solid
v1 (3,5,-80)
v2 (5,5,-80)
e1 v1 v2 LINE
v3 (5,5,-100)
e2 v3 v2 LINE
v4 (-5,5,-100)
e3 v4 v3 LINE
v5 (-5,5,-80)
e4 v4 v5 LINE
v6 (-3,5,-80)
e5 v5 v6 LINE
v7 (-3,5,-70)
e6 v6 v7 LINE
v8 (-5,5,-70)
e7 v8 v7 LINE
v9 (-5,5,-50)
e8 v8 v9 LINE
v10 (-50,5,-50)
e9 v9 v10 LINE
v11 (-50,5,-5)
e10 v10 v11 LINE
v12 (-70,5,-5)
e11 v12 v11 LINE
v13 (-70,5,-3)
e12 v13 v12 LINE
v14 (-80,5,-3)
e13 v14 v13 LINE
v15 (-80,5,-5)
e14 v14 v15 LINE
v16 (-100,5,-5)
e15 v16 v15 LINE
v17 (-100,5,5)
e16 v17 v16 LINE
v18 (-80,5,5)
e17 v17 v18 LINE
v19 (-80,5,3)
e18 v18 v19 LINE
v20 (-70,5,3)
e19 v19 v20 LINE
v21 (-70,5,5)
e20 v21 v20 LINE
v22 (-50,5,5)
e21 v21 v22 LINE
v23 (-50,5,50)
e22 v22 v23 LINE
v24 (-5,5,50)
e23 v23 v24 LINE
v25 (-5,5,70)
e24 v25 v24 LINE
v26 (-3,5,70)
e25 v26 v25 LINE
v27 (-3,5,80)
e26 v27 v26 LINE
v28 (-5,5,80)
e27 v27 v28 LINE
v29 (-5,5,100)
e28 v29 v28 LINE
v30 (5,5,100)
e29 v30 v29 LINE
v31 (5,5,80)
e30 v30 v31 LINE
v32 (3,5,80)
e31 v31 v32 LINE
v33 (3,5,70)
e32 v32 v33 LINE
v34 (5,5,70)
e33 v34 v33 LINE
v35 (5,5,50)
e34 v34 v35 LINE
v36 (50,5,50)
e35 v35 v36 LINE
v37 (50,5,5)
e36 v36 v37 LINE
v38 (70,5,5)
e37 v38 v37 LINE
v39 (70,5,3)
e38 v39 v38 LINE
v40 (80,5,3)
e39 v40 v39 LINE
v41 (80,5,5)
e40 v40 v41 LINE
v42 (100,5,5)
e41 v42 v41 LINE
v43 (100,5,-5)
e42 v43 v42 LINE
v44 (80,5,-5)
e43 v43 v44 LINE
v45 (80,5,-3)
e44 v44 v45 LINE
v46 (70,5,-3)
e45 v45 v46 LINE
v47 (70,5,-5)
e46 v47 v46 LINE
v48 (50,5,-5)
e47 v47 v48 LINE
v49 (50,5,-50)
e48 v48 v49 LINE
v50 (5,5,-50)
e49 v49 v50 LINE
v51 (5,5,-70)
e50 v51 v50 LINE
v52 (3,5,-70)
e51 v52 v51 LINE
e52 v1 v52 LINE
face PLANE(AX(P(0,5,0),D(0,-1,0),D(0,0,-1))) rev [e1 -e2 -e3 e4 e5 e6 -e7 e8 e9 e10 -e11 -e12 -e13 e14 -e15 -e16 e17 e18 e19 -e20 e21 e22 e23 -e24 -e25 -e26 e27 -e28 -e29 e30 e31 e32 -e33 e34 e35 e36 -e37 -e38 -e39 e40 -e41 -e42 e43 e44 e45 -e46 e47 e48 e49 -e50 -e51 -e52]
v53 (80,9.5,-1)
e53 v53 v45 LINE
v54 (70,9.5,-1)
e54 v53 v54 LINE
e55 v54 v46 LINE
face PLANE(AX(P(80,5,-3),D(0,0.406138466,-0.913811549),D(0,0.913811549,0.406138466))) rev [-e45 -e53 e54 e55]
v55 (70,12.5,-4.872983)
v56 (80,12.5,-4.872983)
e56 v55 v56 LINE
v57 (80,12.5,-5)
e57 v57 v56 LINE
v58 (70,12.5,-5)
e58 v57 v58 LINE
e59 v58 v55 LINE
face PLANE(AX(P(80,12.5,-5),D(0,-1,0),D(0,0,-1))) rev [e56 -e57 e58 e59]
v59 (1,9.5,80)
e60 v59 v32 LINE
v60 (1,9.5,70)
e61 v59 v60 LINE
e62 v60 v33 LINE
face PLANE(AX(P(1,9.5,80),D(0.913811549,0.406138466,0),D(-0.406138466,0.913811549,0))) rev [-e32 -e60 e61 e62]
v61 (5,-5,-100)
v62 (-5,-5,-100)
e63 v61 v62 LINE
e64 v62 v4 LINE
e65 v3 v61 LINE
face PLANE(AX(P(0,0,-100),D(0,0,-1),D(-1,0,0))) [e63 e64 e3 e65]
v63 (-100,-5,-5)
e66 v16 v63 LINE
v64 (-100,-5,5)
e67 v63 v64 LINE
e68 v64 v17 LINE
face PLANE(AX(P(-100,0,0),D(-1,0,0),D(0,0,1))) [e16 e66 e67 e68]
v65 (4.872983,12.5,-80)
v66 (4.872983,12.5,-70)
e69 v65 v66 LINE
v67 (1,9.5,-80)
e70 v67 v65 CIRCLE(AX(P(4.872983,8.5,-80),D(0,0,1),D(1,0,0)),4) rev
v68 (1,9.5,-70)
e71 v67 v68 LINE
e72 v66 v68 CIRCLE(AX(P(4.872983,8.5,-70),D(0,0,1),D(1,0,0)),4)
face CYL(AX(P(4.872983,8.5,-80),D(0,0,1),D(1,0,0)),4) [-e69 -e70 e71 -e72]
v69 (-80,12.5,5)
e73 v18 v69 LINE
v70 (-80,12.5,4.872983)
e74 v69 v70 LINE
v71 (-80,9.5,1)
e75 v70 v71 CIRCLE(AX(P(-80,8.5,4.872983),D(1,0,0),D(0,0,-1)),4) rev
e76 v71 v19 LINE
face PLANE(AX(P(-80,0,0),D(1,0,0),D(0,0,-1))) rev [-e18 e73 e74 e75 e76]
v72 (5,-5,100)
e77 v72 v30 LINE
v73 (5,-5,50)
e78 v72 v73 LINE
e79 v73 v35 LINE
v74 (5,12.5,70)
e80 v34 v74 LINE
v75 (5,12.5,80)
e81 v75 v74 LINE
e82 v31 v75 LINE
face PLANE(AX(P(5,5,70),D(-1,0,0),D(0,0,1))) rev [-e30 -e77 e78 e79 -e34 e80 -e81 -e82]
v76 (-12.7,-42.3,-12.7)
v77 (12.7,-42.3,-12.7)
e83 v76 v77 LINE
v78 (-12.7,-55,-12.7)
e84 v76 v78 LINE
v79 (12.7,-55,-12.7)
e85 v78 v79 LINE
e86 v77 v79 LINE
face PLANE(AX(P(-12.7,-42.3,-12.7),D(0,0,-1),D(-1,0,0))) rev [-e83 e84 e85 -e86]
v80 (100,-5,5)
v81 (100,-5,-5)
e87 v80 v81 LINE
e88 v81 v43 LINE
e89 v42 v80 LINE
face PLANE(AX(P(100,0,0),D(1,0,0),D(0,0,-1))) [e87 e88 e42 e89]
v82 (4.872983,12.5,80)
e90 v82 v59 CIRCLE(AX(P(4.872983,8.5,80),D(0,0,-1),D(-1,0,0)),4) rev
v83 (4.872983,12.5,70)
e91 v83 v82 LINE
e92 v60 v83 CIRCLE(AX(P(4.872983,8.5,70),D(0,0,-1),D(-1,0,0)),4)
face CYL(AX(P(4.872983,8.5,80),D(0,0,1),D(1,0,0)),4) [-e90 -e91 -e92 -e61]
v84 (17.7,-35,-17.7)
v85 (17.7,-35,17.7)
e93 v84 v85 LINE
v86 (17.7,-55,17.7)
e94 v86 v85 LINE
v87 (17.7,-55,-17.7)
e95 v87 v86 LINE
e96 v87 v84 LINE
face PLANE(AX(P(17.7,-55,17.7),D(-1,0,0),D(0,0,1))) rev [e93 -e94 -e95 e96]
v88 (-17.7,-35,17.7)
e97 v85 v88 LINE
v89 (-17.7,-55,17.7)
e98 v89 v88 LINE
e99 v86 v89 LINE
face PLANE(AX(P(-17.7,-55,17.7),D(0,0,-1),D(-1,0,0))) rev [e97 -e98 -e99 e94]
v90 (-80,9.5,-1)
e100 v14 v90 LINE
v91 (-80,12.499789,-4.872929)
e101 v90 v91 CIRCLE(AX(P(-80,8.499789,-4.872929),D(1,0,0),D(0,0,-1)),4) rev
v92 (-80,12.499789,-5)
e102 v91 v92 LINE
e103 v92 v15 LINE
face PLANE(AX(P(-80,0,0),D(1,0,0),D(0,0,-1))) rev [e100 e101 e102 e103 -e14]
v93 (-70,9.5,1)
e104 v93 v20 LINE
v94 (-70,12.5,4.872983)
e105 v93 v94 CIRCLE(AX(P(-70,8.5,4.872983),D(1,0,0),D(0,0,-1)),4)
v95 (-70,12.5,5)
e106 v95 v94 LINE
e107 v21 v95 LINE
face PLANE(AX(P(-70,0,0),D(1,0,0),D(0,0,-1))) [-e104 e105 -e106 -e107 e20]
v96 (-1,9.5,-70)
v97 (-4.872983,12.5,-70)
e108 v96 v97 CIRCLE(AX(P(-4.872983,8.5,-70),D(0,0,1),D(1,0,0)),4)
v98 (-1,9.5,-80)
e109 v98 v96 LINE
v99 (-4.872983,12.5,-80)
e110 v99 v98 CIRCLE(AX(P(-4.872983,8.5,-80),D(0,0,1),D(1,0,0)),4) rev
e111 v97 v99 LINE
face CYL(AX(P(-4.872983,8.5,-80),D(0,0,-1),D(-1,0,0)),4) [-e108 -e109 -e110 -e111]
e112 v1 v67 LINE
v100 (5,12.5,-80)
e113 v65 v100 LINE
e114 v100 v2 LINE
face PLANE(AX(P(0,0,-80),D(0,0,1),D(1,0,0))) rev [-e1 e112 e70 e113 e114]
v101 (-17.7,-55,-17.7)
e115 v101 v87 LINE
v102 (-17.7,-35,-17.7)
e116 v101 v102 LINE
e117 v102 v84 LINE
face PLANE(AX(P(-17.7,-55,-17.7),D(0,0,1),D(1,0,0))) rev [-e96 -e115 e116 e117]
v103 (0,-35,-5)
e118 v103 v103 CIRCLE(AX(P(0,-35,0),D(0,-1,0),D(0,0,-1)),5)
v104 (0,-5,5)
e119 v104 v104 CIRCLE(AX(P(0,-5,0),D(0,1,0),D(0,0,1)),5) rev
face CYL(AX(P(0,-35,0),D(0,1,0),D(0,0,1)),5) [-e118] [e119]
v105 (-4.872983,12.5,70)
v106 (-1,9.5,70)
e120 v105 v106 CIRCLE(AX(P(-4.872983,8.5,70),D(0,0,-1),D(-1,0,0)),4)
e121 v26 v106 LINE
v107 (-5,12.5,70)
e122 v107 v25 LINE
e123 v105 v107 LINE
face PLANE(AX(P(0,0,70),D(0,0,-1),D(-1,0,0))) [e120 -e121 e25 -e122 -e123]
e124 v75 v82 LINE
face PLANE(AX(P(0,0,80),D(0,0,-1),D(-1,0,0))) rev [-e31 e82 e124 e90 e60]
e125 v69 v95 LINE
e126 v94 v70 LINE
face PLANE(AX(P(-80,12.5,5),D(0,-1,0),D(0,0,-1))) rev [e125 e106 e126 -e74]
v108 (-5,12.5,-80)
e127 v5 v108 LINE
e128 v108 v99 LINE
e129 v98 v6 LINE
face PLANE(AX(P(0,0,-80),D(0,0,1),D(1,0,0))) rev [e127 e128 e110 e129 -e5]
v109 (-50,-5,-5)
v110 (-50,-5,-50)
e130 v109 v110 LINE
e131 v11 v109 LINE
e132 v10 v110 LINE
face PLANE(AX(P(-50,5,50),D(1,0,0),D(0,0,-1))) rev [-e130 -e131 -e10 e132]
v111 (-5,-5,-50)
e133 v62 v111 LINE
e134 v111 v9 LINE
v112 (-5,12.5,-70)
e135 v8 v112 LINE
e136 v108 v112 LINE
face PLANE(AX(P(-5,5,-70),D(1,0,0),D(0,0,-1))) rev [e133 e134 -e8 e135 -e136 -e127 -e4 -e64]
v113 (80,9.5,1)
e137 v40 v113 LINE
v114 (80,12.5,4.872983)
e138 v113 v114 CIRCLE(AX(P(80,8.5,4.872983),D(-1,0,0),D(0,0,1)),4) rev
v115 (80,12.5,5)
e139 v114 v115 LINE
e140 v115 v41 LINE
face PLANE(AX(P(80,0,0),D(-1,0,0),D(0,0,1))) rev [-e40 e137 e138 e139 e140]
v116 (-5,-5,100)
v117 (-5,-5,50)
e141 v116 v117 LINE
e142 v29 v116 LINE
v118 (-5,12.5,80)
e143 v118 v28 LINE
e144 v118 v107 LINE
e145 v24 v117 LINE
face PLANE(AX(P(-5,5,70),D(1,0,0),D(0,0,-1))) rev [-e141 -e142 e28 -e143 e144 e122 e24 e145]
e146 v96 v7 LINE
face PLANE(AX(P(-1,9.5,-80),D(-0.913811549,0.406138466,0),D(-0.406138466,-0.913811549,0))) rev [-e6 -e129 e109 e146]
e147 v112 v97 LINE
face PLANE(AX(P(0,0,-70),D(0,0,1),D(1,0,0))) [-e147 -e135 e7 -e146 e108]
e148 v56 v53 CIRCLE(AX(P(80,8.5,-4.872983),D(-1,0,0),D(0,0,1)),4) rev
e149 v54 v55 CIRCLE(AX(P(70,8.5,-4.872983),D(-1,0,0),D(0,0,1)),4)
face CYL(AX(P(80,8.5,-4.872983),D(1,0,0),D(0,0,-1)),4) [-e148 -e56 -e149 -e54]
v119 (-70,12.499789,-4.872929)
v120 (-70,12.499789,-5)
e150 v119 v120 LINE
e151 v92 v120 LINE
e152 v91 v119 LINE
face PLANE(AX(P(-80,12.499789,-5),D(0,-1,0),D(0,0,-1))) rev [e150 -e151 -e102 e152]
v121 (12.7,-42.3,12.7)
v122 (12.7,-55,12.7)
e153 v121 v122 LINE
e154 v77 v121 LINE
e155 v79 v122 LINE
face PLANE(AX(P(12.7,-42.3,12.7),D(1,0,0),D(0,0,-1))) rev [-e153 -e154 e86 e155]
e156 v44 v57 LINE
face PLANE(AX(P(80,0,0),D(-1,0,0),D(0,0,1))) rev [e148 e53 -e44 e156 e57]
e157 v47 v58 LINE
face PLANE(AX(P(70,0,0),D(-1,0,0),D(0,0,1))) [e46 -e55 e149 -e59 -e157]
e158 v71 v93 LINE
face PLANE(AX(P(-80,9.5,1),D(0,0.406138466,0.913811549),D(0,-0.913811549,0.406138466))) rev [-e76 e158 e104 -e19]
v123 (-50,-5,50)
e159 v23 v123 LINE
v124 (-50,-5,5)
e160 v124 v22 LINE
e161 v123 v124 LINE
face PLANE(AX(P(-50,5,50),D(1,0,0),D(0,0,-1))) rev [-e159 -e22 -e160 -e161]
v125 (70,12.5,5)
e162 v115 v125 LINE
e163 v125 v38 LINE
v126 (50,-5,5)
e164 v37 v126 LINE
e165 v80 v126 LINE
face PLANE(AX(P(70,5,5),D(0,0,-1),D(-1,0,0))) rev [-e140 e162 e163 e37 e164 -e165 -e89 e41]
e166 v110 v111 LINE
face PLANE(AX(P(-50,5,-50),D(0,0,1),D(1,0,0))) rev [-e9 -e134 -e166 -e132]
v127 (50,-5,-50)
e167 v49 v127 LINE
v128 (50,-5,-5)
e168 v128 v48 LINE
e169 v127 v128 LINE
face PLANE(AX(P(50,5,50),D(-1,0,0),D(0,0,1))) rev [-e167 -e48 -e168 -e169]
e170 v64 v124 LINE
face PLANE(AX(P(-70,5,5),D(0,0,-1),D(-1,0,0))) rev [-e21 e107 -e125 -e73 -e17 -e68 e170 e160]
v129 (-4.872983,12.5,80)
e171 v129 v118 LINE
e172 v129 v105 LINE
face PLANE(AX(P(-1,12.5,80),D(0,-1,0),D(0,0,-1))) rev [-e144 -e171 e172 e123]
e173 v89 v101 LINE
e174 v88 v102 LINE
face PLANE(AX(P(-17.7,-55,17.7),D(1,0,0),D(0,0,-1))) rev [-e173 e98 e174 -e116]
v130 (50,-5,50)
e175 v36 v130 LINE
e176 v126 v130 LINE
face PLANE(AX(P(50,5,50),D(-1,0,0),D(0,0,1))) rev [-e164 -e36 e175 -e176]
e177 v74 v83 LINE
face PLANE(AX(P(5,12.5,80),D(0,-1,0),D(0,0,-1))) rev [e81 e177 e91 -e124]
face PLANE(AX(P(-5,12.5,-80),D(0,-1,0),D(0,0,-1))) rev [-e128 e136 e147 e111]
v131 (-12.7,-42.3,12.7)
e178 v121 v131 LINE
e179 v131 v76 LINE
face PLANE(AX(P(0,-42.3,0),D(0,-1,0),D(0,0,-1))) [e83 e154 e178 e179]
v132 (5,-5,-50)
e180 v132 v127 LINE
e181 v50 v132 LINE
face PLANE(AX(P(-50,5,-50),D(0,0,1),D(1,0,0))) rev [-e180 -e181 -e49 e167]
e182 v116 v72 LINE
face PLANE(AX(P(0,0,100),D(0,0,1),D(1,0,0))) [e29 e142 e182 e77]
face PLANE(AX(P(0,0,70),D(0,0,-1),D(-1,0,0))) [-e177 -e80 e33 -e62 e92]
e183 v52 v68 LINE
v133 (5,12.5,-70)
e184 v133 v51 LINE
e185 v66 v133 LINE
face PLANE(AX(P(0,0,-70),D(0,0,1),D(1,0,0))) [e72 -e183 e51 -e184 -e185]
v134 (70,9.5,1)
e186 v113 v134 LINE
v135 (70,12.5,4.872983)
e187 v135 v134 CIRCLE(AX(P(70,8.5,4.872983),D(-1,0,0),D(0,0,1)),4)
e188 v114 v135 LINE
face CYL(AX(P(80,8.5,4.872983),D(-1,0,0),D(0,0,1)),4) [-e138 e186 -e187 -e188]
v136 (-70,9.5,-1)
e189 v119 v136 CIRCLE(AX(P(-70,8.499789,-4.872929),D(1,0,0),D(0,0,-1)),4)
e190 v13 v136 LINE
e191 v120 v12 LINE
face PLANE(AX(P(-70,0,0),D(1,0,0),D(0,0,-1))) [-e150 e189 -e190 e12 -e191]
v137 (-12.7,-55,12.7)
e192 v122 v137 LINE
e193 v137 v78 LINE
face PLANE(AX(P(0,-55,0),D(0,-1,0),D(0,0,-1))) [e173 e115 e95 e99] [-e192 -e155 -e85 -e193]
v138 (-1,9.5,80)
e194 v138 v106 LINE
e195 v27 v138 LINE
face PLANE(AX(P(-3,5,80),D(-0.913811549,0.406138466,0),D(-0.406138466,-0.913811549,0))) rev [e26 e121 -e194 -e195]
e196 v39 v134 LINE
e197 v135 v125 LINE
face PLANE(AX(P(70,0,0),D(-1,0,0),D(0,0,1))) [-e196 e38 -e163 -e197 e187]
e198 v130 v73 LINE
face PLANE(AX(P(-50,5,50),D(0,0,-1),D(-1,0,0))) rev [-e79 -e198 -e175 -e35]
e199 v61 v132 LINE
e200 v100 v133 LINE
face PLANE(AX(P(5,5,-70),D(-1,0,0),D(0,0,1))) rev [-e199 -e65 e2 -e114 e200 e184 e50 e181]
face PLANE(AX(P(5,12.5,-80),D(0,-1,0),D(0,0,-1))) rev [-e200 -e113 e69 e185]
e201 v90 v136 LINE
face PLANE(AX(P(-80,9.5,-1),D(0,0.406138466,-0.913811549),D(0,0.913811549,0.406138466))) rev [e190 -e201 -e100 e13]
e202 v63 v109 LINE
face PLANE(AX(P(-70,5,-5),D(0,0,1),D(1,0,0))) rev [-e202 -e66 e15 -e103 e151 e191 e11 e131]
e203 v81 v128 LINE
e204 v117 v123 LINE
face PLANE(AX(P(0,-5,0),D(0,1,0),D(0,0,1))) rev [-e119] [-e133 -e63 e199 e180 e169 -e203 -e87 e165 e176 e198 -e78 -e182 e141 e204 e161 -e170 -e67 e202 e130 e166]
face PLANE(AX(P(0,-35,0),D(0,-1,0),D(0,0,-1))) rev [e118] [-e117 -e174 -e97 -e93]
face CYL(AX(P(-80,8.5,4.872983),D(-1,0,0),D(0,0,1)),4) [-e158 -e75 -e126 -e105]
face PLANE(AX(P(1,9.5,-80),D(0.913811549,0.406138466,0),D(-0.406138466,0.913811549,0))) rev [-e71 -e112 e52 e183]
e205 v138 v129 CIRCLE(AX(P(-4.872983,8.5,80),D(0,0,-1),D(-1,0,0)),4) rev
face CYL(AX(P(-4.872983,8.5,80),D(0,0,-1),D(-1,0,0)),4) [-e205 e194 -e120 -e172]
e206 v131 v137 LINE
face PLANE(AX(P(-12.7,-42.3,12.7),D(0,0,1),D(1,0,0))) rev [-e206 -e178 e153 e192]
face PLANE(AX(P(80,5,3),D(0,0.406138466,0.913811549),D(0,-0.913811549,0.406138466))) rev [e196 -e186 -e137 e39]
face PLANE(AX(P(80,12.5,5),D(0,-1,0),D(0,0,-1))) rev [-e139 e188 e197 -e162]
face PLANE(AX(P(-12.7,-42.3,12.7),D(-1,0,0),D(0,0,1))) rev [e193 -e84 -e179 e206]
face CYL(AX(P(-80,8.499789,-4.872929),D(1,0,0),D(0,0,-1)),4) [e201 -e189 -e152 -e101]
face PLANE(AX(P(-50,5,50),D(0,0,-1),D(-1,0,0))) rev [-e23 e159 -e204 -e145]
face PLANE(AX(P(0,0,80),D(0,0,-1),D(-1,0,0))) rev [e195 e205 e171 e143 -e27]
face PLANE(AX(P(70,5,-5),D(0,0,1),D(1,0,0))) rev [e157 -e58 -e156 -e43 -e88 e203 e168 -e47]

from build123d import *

# Parameters (mm, degrees)
SKETCH2_W            = 100
SKETCH2_H            = 100
BOSS_EXTRUDE1_DEPTH  = 5
SKETCH3_W            = 100
SKETCH3_H            = 100
BOSS_EXTRUDE2_DEPTH  = 5
SKETCH8_R            = 5
BOSS_EXTRUDE7_DEPTH  = 30
SKETCH9_W            = 35.4
SKETCH9_H            = 35.4
BOSS_EXTRUDE8_DEPTH  = 20
SKETCH10_W           = 25.4
SKETCH10_H           = 25.4
CUT_EXTRUDE1_DEPTH   = 12.7
SKETCH11_W           = 10
SKETCH11_H           = 10
BOSS_EXTRUDE9_DEPTH  = 20
BOSS_EXTRUDE13_DEPTH = 10
FILLET3_R            = 4
FILLET5_R            = 4
SKETCH16_W           = 10
SKETCH16_H           = 10
BOSS_EXTRUDE14_DEPTH = 20
SKETCH13_W           = 10
SKETCH13_H           = 10
BOSS_EXTRUDE11_DEPTH = 20
BOSS_EXTRUDE17_DEPTH = 10
FILLET9_R            = 4
FILLET10_R           = 4
SKETCH21_W           = 10
SKETCH21_H           = 10
BOSS_EXTRUDE18_DEPTH = 20
SKETCH14_W           = 10
SKETCH14_H           = 10
BOSS_EXTRUDE12_DEPTH = 20
BOSS_EXTRUDE15_DEPTH = 10
FILLET7_R            = 4
SKETCH18_W           = 10
SKETCH18_H           = 10
BOSS_EXTRUDE16_DEPTH = 20
FILLET8_R            = 4
SKETCH12_W           = 10
SKETCH12_H           = 10
BOSS_EXTRUDE10_DEPTH = 20
BOSS_EXTRUDE19_DEPTH = 10
FILLET11_R           = 4
FILLET12_R           = 4
SKETCH23_W           = 10
SKETCH23_H           = 10
BOSS_EXTRUDE20_DEPTH = 20


with BuildPart() as part:
    # Sketch2 → Boss-Extrude1 (new body)
    with BuildSketch(Plane(origin=(0, 0, 0), x_dir=(1, 0, 0), z_dir=(0, 1, 0))):
        Rectangle(SKETCH2_W, SKETCH2_H)
    extrude(amount=BOSS_EXTRUDE1_DEPTH)

    # Sketch3 → Boss-Extrude2 (add)
    with BuildSketch(Plane.XZ):
        Rectangle(SKETCH3_W, SKETCH3_H)
    extrude(amount=BOSS_EXTRUDE2_DEPTH)

    # Sketch8 → Boss-Extrude7 (add)
    with BuildSketch(Plane.XZ.offset(5)):
        with Locations(Location((0, 0, 0), (0, 0, 90))):
            Circle(SKETCH8_R)
    extrude(amount=BOSS_EXTRUDE7_DEPTH)

    # Sketch9 → Boss-Extrude8 (add)
    with BuildSketch(Plane.XZ.offset(35)):
        Rectangle(SKETCH9_W, SKETCH9_H)
    extrude(amount=BOSS_EXTRUDE8_DEPTH)

    # Sketch10 → Cut-Extrude1 (cut)
    with BuildSketch(Plane.XZ.offset(55)):
        Rectangle(SKETCH10_W, SKETCH10_H)
    extrude(amount=-CUT_EXTRUDE1_DEPTH, mode=Mode.SUBTRACT)

    # Sketch11 → Boss-Extrude9 (add)
    with BuildSketch(Plane(origin=(50, 0, 0), x_dir=(0, 0, -1), z_dir=(1, 0, 0))):
        Rectangle(SKETCH11_W, SKETCH11_H)
    extrude(amount=BOSS_EXTRUDE9_DEPTH)

    # Sketch15 → Boss-Extrude13 (add)
    with BuildSketch(Plane(origin=(70, 0, 0), x_dir=(0, 0, -1), z_dir=(1, 0, 0))):
        Polygon((-5, -5), (5, -5), (5, 12.5), (1, 12.5), (1, 9.5), (3, 5), (-3, 5), (-1, 9.5), (-1, 12.5), (-5, 12.5), align=None)
    extrude(amount=BOSS_EXTRUDE13_DEPTH)

    # Fillet3
    # the kernel refuses this fillet: 4 mm, written as the material it takes off along each edge
    with BuildSketch(Plane(origin=(60.317541634, 12.5, 1), x_dir=(0, -1, 0), z_dir=(1, 0, 0))) as fillet3_piece_1:
        with BuildLine():
            CenterArc((4, -3.872983346), FILLET3_R, 104.477512186, 75.522487814)
            Line((0, -3.872983346), (-0.08, -3.872983346))
            Line((-0.08, -3.872983346), (-0.08, 0))
            Line((-0.08, 0), (0, 0.08))
            ThreePointArc((0, 0.08), (1.5, 0.08), (2.98, 0.077459667))
            Line((2.98, 0.077459667), (3, 0))
        make_face()
    extrude(amount=29.364916731, mode=Mode.SUBTRACT)

    # Fillet5
    # the kernel refuses this fillet: 4 mm, written as the material it takes off along each edge
    with BuildSketch(Plane(origin=(60.317541634, 12.5, -1), x_dir=(0, 0, -1), z_dir=(1, 0, 0))) as fillet5_piece_1:
        with BuildLine():
            CenterArc((3.872983346, -4), FILLET5_R, 90, 75.522487814)
            Line((0, -3), (-0.077459667, -2.98))
            ThreePointArc((-0.077459667, -2.98), (-0.08, -1.5), (-0.08, 0))
            Line((-0.08, 0), (0, 0.08))
            Line((0, 0.08), (3.872983346, 0.08))
            Line((3.872983346, 0.08), (3.872983346, 0))
        make_face()
    extrude(amount=29.364916731, mode=Mode.SUBTRACT)

    # Sketch16 → Boss-Extrude14 (add)
    with BuildSketch(Plane(origin=(80, 0, 0), x_dir=(0, 0, -1), z_dir=(1, 0, 0))):
        Rectangle(SKETCH16_W, SKETCH16_H)
    extrude(amount=BOSS_EXTRUDE14_DEPTH)

    # Sketch13 → Boss-Extrude11 (add)
    with BuildSketch(Plane.ZY.offset(50)):
        Rectangle(SKETCH13_W, SKETCH13_H)
    extrude(amount=BOSS_EXTRUDE11_DEPTH)

    # Sketch19 → Boss-Extrude17 (add)
    with BuildSketch(Plane.ZY.offset(70)):
        Polygon((-5, -5), (5, -5), (5, 12.5), (1, 12.5), (1, 9.5), (3, 5), (-3, 5), (-1, 9.5), (-1, 12.499789013), (-5, 12.499789013), align=None)
    extrude(amount=BOSS_EXTRUDE17_DEPTH)

    # Fillet9
    # the kernel refuses this fillet: 4 mm, written as the material it takes off along each edge
    with BuildSketch(Plane(origin=(-60.317677841, 12.499789013, -1), x_dir=(0, -1, 0), z_dir=(-1, 0, 0))) as fillet9_piece_1:
        with BuildLine():
            CenterArc((4, -3.872928863), FILLET9_R, 104.480633491, 75.519366509)
            Line((0, -3.872928863), (-0.08, -3.872928863))
            Line((-0.08, -3.872928863), (-0.08, 0))
            Line((-0.08, 0), (0, 0.08))
            ThreePointArc((0, 0.08), (1.499894506, 0.08), (2.979784793, 0.077458577))
            Line((2.979784793, 0.077458577), (2.999789013, 0))
        make_face()
    extrude(amount=29.364644317, mode=Mode.SUBTRACT)

    # Fillet10
    # the kernel refuses this fillet: 4 mm, written as the material it takes off along each edge
    with BuildSketch(Plane(origin=(-60.317541634, 12.5, 1), x_dir=(0, 0, 1), z_dir=(-1, 0, 0))) as fillet10_piece_1:
        with BuildLine():
            CenterArc((3.872983346, -4), FILLET10_R, 90, 75.522487814)
            Line((0, -3), (-0.077459667, -2.98))
            ThreePointArc((-0.077459667, -2.98), (-0.08, -1.5), (-0.08, 0))
            Line((-0.08, 0), (0, 0.08))
            Line((0, 0.08), (3.872983346, 0.08))
            Line((3.872983346, 0.08), (3.872983346, 0))
        make_face()
    extrude(amount=29.364916731, mode=Mode.SUBTRACT)

    # Sketch21 → Boss-Extrude18 (add)
    with BuildSketch(Plane.ZY.offset(80)):
        Rectangle(SKETCH21_W, SKETCH21_H)
    extrude(amount=BOSS_EXTRUDE18_DEPTH)

    # Sketch14 → Boss-Extrude12 (add)
    with BuildSketch(Plane(origin=(0, 0, -50), x_dir=(-1, 0, 0), z_dir=(0, 0, -1))):
        Rectangle(SKETCH14_W, SKETCH14_H)
    extrude(amount=BOSS_EXTRUDE12_DEPTH)

    # Sketch17 → Boss-Extrude15 (add)
    with BuildSketch(Plane(origin=(0, 0, -70), x_dir=(-1, 0, 0), z_dir=(0, 0, -1))):
        Polygon((-5, -5), (5, -5), (5, 12.5), (1, 12.5), (1, 9.5), (3, 5), (-3, 5), (-1, 9.5), (-1, 12.5), (-5, 12.5), align=None)
    extrude(amount=BOSS_EXTRUDE15_DEPTH)

    # Fillet7
    # the kernel refuses this fillet: 4 mm, written as the material it takes off along each edge
    with BuildSketch(Plane(origin=(1, 12.5, -60.317541634), x_dir=(0, -1, 0), z_dir=(0, 0, -1))) as fillet7_piece_1:
        with BuildLine():
            CenterArc((4, -3.872983346), FILLET7_R, 104.477512186, 75.522487814)
            Line((0, -3.872983346), (-0.08, -3.872983346))
            Line((-0.08, -3.872983346), (-0.08, 0))
            Line((-0.08, 0), (0, 0.08))
            ThreePointArc((0, 0.08), (1.5, 0.08), (2.98, 0.077459667))
            Line((2.98, 0.077459667), (3, 0))
        make_face()
    extrude(amount=29.364916731, mode=Mode.SUBTRACT)

    # Sketch18 → Boss-Extrude16 (add)
    with BuildSketch(Plane(origin=(0, 0, -80), x_dir=(-1, 0, 0), z_dir=(0, 0, -1))):
        Rectangle(SKETCH18_W, SKETCH18_H)
    extrude(amount=BOSS_EXTRUDE16_DEPTH)

    # Fillet8
    # the kernel refuses this fillet: 4 mm, written as the material it takes off along each edge
    with BuildSketch(Plane(origin=(-1, 12.5, -60.317541634), x_dir=(-1, 0, 0), z_dir=(0, 0, -1))) as fillet8_piece_1:
        with BuildLine():
            CenterArc((3.872983346, -4), FILLET8_R, 90, 75.522487814)
            Line((0, -3), (-0.077459667, -2.98))
            ThreePointArc((-0.077459667, -2.98), (-0.08, -1.5), (-0.08, 0))
            Line((-0.08, 0), (0, 0.08))
            Line((0, 0.08), (3.872983346, 0.08))
            Line((3.872983346, 0.08), (3.872983346, 0))
        make_face()
    extrude(amount=29.364916731, mode=Mode.SUBTRACT)

    # Sketch12 → Boss-Extrude10 (add)
    with BuildSketch(Plane.XY.offset(50)):
        Rectangle(SKETCH12_W, SKETCH12_H)
    extrude(amount=BOSS_EXTRUDE10_DEPTH)

    # Sketch22 → Boss-Extrude19 (add)
    with BuildSketch(Plane.XY.offset(70)):
        Polygon((5, -5), (5, 12.5), (1, 12.5), (1, 9.5), (3, 5), (-3, 5), (-1, 9.5), (-1, 12.5), (-5, 12.5), (-5, -5), align=None)
    extrude(amount=BOSS_EXTRUDE19_DEPTH)

    # Fillet11
    # the kernel refuses this fillet: 4 mm, written as the material it takes off along each edge
    with BuildSketch(Plane(origin=(-1, 12.5, 60.317541634), x_dir=(0, -1, 0), z_dir=(0, 0, 1))) as fillet11_piece_1:
        with BuildLine():
            CenterArc((4, -3.872983346), FILLET11_R, 104.477512186, 75.522487814)
            Line((0, -3.872983346), (-0.08, -3.872983346))
            Line((-0.08, -3.872983346), (-0.08, 0))
            Line((-0.08, 0), (0, 0.08))
            ThreePointArc((0, 0.08), (1.5, 0.08), (2.98, 0.077459667))
            Line((2.98, 0.077459667), (3, 0))
        make_face()
    extrude(amount=29.364916731, mode=Mode.SUBTRACT)

    # Fillet12
    # the kernel refuses this fillet: 4 mm, written as the material it takes off along each edge
    with BuildSketch(Plane(origin=(1, 12.5, 60.317541634), x_dir=(1, 0, 0), z_dir=(0, 0, 1))) as fillet12_piece_1:
        with BuildLine():
            CenterArc((3.872983346, -4), FILLET12_R, 90, 75.522487814)
            Line((0, -3), (-0.077459667, -2.98))
            ThreePointArc((-0.077459667, -2.98), (-0.08, -1.5), (-0.08, 0))
            Line((-0.08, 0), (0, 0.08))
            Line((0, 0.08), (3.872983346, 0.08))
            Line((3.872983346, 0.08), (3.872983346, 0))
        make_face()
    extrude(amount=29.364916731, mode=Mode.SUBTRACT)

    # Sketch23 → Boss-Extrude20 (add)
    with BuildSketch(Plane.XY.offset(80)):
        Rectangle(SKETCH23_W, SKETCH23_H)
    extrude(amount=BOSS_EXTRUDE20_DEPTH)


solid = part.part
